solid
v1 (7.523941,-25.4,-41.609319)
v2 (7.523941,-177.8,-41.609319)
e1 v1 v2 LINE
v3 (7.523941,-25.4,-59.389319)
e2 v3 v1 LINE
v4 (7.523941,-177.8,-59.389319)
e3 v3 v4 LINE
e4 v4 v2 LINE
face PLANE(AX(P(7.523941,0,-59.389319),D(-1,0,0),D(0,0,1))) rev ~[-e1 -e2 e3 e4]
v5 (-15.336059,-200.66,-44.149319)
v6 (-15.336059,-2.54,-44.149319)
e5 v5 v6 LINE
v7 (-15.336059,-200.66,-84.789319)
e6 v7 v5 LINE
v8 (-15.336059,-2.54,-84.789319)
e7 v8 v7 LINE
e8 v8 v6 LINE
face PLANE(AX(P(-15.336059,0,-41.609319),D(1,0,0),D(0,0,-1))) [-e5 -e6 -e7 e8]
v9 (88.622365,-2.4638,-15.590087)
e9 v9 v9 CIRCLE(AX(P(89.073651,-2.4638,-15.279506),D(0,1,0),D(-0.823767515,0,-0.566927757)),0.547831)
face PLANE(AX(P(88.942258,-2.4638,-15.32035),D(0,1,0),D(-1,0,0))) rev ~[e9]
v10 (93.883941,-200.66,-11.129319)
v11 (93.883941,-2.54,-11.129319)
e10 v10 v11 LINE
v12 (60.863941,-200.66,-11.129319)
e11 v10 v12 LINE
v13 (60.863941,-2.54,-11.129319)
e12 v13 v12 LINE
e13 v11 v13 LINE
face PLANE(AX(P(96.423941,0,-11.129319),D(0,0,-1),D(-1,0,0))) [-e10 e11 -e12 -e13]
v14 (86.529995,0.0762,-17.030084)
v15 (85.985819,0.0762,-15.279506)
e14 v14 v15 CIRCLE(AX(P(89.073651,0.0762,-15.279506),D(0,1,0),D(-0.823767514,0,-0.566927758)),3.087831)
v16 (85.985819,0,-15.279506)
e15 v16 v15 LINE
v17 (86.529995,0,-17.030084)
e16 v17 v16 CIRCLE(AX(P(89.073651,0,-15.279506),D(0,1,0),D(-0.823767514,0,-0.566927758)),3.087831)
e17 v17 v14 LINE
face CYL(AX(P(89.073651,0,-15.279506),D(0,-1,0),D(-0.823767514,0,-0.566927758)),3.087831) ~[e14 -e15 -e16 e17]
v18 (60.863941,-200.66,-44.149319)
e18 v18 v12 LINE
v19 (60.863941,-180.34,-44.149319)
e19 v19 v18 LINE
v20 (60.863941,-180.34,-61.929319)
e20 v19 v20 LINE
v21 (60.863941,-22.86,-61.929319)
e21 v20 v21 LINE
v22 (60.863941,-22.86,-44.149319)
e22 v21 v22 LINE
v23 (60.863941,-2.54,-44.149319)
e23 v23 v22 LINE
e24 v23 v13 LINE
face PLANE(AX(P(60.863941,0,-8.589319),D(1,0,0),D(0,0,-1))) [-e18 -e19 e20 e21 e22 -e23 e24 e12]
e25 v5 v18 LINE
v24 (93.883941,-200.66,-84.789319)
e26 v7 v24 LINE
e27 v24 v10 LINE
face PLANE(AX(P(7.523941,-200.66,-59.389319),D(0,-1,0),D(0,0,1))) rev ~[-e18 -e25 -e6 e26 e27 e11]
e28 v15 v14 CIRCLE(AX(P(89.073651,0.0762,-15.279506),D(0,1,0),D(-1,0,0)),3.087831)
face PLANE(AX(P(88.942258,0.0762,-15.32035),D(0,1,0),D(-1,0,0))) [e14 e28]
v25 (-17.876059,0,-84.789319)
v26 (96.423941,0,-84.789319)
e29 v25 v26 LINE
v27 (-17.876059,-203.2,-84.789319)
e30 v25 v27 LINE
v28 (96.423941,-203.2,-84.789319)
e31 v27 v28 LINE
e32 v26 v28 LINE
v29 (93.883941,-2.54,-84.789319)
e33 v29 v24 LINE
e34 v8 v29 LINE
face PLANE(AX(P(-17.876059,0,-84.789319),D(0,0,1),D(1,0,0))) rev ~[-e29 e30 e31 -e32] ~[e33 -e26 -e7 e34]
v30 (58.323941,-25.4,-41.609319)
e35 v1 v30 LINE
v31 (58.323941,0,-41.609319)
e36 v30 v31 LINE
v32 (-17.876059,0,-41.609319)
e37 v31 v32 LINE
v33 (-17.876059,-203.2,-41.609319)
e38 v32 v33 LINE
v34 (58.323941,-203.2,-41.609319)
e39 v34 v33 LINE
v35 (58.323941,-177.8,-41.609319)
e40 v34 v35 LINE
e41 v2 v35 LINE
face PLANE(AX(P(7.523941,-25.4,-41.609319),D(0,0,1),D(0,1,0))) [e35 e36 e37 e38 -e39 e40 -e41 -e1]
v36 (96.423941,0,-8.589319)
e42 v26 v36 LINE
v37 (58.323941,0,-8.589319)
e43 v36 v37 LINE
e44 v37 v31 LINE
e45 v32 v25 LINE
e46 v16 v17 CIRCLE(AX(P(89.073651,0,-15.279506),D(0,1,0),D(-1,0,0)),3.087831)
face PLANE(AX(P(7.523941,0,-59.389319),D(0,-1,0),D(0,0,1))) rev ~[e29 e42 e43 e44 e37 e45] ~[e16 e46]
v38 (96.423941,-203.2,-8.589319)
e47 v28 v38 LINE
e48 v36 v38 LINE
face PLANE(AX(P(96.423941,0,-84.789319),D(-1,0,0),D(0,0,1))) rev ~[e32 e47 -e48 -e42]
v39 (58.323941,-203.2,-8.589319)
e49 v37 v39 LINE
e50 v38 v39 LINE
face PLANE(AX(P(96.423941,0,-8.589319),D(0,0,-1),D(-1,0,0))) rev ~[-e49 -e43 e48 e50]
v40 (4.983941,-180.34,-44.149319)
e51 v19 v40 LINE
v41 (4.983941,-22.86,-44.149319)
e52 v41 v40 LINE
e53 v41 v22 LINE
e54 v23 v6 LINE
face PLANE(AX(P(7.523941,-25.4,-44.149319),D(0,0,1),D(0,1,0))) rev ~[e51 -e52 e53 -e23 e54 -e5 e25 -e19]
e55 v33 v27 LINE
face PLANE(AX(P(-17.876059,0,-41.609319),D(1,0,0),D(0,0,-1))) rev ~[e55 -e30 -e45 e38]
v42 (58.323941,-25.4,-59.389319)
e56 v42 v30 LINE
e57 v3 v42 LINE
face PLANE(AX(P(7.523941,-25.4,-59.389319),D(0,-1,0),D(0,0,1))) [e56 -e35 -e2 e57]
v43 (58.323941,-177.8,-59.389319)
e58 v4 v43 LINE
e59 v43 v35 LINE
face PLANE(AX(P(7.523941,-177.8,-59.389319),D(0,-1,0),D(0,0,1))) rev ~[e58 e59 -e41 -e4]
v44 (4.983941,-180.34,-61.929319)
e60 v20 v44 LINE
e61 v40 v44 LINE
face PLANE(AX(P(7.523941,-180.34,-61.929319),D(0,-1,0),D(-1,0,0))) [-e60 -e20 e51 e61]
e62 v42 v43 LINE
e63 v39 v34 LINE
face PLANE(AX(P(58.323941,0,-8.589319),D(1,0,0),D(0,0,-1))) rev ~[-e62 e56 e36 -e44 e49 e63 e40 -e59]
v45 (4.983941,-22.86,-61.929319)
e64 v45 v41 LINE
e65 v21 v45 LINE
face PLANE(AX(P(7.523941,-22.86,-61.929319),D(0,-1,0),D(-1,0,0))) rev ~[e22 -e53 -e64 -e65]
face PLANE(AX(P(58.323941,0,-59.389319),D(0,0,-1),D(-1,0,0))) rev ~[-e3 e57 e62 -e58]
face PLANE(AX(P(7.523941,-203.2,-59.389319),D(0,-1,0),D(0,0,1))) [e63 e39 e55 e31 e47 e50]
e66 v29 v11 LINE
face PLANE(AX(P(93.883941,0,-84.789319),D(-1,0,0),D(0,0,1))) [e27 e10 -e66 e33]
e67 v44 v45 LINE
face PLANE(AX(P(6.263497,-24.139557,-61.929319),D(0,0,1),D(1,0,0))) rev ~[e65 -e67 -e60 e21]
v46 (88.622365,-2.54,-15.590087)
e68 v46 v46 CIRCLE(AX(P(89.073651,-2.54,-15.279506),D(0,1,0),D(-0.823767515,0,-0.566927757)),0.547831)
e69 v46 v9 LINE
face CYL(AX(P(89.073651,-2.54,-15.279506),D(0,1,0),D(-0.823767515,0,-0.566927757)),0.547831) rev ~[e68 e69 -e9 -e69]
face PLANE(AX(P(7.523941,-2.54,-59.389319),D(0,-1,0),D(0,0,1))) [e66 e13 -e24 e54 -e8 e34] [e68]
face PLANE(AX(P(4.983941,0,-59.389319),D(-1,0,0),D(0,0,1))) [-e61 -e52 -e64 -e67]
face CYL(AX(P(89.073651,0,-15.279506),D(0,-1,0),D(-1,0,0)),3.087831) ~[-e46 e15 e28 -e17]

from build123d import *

# Parameters (mm, degrees)
F1_DEPTH      = 203.2
F2_W          = 25.4
F2_H          = 17.78
F3_DEPTH      = 50.8
F4_W          = 25.4
F4_H          = 17.78
F5_DEPTH      = 50.8
F11_DEPTH     = 0.0762
F31_T         = 2.54
F31_T3_DEPTH  = 30.48
F31_T5_DEPTH  = 22.86
F31_T7_DEPTH  = 157.48
F31_T9_DEPTH  = 30.48
F31_T11_DEPTH = 55.88


# Not quite as in the source:
# - a shell that OpenCascade refuses in one call is made with other operations: the cavity is built on its own and cut out
# - the program builds the solid bodies; features that only make, move or delete a surface that nothing else refers to are left out


with BuildPart() as f1:
    # F0 (on Front) → F1 (new body)
    with BuildSketch(Plane.XZ):
        Polygon((7.5239408249, -41.6093189047), (-17.8760591751, -41.6093189047), (-17.8760591751, -84.7893189047), (96.4239408249, -84.7893189047), (96.4239408249, -8.5893189047), (58.3239408249, -8.5893189047), (58.3239408249, -59.3893189047), (7.5239408249, -59.3893189047), align=None)
    extrude(amount=F1_DEPTH)

    # F2 (on face) → F3 (join)
    with BuildSketch(Plane.YZ.offset(7.5239408249)):
        with Locations((-190.5, -50.4993189047)):
            Rectangle(F2_W, F2_H)
    extrude(amount=F3_DEPTH)

    # F4 (on face) → F5 (join)
    with BuildSketch(Plane.YZ.offset(7.5239408249)):
        with Locations((-12.7, -50.4993189047)):
            Rectangle(F4_W, F4_H)
    extrude(amount=F5_DEPTH)

    # F9 (on face) → F11 (join)
    with BuildSketch(Plane(origin=(0, 0, 0), x_dir=(-1, 0, 0), z_dir=(0, 1, 0))):
        with BuildLine():
            ThreePointArc((-85.9858192503, -15.2795063332), (-92.0223010679, -14.3629027521), (-86.5299954351, -17.0300836035))
            ThreePointArc((-86.5299954351, -17.0300836035), (-86.12500001, -16.1961099143), (-85.9858192503, -15.2795063332))
        make_face()
    extrude(amount=F11_DEPTH)

    # F31: shell of thickness 2.54, made by hand


with BuildPart() as f31_core1:
    # F31_t2: copy of F1
    add(f1.part)

    # the walls: a layer under each face that stays
    f31_faces = [f31_core1.faces().sort_by_distance(p)[0] for p in [
        (77.3739408249, -101.6, -8.5893189047),
        (96.4239408249, -101.6, -46.6893189047),
        (58.3239408249, -101.6, -33.9893189047),
        (39.2739408249, 0, -46.6893189047),
        (39.2739408249, -203.2, -46.6893189047),
        (-5.1760591751, -33.8666666667, -41.6093189047),
        (32.9239408249, -25.4, -50.4993189047),
        (32.9239408249, -101.6, -59.3893189047),
        (32.9239408249, -177.8, -50.4993189047),
        (-17.8760591751, -101.6, -63.1993189047),
        (91.6173056428, 0.0381, -13.5289290629),
        (7.5239408249, -101.6, -50.4993189047),
        (89.0736505389, 0.0762, -15.2795063332),
    ]]
    thicken(f31_faces, amount=-F31_T, mode=Mode.SUBTRACT)

    # F31_s4 → F31_t3 (cut)
    with BuildSketch(Plane.XZ.offset(-2.54)):
        Polygon((58.2985408249, -41.5839189047), (60.8639408249, -41.6093189047), (60.8639408249, -44.1493189047), (58.3239408249, -44.1493189047), align=None)
    extrude(amount=F31_T3_DEPTH, mode=Mode.SUBTRACT)

    # F31_s6 → F31_t5 (cut)
    with BuildSketch(Plane.XY.offset(-61.9293189047)):
        Polygon((58.2985408249, -25.4254), (60.8639408249, -25.4), (60.8639408249, -22.86), (58.3239408249, -22.86), align=None)
        Polygon((58.2985408249, -177.7746), (60.8639408249, -177.8), (60.8639408249, -180.34), (58.3239408249, -180.34), align=None)
        Polygon((7.5493408249, -25.4254), (7.5239408249, -22.86), (4.9839408249, -22.86), (4.9839408249, -25.4), align=None)
        Polygon((7.5493408249, -177.7746), (7.5239408249, -180.34), (4.9839408249, -180.34), (4.9839408249, -177.8), align=None)
    extrude(amount=F31_T5_DEPTH, mode=Mode.SUBTRACT)

    # F31_s8 → F31_t7 (cut)
    with BuildSketch(Plane.XZ.offset(22.86)):
        Polygon((58.2985408249, -59.3639189047), (60.8639408249, -59.3893189047), (60.8639408249, -61.9293189047), (58.3239408249, -61.9293189047), align=None)
        Polygon((7.5493408249, -59.3639189047), (7.5239408249, -61.9293189047), (4.9839408249, -61.9293189047), (4.9839408249, -59.3893189047), align=None)
    extrude(amount=F31_T7_DEPTH, mode=Mode.SUBTRACT)

    # F31_s10 → F31_t9 (cut)
    with BuildSketch(Plane.XZ.offset(175.26)):
        Polygon((58.2985408249, -41.5839189047), (60.8639408249, -41.6093189047), (60.8639408249, -44.1493189047), (58.3239408249, -44.1493189047), align=None)
    extrude(amount=F31_T9_DEPTH, mode=Mode.SUBTRACT)

    # F31_s12 → F31_t11 (cut)
    with BuildSketch(Plane.YZ.offset(4.9839408249)):
        Polygon((-25.4254, -59.3639189047), (-22.86, -59.3893189047), (-22.86, -61.9293189047), (-25.4, -61.9293189047), align=None)
        Polygon((-177.7746, -59.3639189047), (-177.8, -61.9293189047), (-180.34, -61.9293189047), (-180.34, -59.3893189047), align=None)
    extrude(amount=F31_T11_DEPTH, mode=Mode.SUBTRACT)

    # F31_s13 → F31_t14 (revolve, cut)
    with BuildSketch(Plane(origin=(35.7646863661, 0, -51.9674444282), x_dir=(0, 1, 0), z_dir=(0.5669277583, 0, -0.8237675139))):
        Polygon((0.0254, 61.6003720947), (-2.54, 61.6257720947), (-2.54, 64.1657720947), (0, 64.1657720947), align=None)
    revolve(axis=Axis((89.0736505389, 0, -15.2795063332), (0, 1, 0)), mode=Mode.SUBTRACT)


with BuildPart() as f1_1:
    add(f1.part)

    # what is left inside the walls is the cavity
    f31_cavity = [f31_core1.part.solids().sort_by_distance(p)[0] for p in [
        (39.273941, -134.62, -84.763919),
    ]]
    add(f31_cavity, mode=Mode.SUBTRACT)


solid = f1_1.part
